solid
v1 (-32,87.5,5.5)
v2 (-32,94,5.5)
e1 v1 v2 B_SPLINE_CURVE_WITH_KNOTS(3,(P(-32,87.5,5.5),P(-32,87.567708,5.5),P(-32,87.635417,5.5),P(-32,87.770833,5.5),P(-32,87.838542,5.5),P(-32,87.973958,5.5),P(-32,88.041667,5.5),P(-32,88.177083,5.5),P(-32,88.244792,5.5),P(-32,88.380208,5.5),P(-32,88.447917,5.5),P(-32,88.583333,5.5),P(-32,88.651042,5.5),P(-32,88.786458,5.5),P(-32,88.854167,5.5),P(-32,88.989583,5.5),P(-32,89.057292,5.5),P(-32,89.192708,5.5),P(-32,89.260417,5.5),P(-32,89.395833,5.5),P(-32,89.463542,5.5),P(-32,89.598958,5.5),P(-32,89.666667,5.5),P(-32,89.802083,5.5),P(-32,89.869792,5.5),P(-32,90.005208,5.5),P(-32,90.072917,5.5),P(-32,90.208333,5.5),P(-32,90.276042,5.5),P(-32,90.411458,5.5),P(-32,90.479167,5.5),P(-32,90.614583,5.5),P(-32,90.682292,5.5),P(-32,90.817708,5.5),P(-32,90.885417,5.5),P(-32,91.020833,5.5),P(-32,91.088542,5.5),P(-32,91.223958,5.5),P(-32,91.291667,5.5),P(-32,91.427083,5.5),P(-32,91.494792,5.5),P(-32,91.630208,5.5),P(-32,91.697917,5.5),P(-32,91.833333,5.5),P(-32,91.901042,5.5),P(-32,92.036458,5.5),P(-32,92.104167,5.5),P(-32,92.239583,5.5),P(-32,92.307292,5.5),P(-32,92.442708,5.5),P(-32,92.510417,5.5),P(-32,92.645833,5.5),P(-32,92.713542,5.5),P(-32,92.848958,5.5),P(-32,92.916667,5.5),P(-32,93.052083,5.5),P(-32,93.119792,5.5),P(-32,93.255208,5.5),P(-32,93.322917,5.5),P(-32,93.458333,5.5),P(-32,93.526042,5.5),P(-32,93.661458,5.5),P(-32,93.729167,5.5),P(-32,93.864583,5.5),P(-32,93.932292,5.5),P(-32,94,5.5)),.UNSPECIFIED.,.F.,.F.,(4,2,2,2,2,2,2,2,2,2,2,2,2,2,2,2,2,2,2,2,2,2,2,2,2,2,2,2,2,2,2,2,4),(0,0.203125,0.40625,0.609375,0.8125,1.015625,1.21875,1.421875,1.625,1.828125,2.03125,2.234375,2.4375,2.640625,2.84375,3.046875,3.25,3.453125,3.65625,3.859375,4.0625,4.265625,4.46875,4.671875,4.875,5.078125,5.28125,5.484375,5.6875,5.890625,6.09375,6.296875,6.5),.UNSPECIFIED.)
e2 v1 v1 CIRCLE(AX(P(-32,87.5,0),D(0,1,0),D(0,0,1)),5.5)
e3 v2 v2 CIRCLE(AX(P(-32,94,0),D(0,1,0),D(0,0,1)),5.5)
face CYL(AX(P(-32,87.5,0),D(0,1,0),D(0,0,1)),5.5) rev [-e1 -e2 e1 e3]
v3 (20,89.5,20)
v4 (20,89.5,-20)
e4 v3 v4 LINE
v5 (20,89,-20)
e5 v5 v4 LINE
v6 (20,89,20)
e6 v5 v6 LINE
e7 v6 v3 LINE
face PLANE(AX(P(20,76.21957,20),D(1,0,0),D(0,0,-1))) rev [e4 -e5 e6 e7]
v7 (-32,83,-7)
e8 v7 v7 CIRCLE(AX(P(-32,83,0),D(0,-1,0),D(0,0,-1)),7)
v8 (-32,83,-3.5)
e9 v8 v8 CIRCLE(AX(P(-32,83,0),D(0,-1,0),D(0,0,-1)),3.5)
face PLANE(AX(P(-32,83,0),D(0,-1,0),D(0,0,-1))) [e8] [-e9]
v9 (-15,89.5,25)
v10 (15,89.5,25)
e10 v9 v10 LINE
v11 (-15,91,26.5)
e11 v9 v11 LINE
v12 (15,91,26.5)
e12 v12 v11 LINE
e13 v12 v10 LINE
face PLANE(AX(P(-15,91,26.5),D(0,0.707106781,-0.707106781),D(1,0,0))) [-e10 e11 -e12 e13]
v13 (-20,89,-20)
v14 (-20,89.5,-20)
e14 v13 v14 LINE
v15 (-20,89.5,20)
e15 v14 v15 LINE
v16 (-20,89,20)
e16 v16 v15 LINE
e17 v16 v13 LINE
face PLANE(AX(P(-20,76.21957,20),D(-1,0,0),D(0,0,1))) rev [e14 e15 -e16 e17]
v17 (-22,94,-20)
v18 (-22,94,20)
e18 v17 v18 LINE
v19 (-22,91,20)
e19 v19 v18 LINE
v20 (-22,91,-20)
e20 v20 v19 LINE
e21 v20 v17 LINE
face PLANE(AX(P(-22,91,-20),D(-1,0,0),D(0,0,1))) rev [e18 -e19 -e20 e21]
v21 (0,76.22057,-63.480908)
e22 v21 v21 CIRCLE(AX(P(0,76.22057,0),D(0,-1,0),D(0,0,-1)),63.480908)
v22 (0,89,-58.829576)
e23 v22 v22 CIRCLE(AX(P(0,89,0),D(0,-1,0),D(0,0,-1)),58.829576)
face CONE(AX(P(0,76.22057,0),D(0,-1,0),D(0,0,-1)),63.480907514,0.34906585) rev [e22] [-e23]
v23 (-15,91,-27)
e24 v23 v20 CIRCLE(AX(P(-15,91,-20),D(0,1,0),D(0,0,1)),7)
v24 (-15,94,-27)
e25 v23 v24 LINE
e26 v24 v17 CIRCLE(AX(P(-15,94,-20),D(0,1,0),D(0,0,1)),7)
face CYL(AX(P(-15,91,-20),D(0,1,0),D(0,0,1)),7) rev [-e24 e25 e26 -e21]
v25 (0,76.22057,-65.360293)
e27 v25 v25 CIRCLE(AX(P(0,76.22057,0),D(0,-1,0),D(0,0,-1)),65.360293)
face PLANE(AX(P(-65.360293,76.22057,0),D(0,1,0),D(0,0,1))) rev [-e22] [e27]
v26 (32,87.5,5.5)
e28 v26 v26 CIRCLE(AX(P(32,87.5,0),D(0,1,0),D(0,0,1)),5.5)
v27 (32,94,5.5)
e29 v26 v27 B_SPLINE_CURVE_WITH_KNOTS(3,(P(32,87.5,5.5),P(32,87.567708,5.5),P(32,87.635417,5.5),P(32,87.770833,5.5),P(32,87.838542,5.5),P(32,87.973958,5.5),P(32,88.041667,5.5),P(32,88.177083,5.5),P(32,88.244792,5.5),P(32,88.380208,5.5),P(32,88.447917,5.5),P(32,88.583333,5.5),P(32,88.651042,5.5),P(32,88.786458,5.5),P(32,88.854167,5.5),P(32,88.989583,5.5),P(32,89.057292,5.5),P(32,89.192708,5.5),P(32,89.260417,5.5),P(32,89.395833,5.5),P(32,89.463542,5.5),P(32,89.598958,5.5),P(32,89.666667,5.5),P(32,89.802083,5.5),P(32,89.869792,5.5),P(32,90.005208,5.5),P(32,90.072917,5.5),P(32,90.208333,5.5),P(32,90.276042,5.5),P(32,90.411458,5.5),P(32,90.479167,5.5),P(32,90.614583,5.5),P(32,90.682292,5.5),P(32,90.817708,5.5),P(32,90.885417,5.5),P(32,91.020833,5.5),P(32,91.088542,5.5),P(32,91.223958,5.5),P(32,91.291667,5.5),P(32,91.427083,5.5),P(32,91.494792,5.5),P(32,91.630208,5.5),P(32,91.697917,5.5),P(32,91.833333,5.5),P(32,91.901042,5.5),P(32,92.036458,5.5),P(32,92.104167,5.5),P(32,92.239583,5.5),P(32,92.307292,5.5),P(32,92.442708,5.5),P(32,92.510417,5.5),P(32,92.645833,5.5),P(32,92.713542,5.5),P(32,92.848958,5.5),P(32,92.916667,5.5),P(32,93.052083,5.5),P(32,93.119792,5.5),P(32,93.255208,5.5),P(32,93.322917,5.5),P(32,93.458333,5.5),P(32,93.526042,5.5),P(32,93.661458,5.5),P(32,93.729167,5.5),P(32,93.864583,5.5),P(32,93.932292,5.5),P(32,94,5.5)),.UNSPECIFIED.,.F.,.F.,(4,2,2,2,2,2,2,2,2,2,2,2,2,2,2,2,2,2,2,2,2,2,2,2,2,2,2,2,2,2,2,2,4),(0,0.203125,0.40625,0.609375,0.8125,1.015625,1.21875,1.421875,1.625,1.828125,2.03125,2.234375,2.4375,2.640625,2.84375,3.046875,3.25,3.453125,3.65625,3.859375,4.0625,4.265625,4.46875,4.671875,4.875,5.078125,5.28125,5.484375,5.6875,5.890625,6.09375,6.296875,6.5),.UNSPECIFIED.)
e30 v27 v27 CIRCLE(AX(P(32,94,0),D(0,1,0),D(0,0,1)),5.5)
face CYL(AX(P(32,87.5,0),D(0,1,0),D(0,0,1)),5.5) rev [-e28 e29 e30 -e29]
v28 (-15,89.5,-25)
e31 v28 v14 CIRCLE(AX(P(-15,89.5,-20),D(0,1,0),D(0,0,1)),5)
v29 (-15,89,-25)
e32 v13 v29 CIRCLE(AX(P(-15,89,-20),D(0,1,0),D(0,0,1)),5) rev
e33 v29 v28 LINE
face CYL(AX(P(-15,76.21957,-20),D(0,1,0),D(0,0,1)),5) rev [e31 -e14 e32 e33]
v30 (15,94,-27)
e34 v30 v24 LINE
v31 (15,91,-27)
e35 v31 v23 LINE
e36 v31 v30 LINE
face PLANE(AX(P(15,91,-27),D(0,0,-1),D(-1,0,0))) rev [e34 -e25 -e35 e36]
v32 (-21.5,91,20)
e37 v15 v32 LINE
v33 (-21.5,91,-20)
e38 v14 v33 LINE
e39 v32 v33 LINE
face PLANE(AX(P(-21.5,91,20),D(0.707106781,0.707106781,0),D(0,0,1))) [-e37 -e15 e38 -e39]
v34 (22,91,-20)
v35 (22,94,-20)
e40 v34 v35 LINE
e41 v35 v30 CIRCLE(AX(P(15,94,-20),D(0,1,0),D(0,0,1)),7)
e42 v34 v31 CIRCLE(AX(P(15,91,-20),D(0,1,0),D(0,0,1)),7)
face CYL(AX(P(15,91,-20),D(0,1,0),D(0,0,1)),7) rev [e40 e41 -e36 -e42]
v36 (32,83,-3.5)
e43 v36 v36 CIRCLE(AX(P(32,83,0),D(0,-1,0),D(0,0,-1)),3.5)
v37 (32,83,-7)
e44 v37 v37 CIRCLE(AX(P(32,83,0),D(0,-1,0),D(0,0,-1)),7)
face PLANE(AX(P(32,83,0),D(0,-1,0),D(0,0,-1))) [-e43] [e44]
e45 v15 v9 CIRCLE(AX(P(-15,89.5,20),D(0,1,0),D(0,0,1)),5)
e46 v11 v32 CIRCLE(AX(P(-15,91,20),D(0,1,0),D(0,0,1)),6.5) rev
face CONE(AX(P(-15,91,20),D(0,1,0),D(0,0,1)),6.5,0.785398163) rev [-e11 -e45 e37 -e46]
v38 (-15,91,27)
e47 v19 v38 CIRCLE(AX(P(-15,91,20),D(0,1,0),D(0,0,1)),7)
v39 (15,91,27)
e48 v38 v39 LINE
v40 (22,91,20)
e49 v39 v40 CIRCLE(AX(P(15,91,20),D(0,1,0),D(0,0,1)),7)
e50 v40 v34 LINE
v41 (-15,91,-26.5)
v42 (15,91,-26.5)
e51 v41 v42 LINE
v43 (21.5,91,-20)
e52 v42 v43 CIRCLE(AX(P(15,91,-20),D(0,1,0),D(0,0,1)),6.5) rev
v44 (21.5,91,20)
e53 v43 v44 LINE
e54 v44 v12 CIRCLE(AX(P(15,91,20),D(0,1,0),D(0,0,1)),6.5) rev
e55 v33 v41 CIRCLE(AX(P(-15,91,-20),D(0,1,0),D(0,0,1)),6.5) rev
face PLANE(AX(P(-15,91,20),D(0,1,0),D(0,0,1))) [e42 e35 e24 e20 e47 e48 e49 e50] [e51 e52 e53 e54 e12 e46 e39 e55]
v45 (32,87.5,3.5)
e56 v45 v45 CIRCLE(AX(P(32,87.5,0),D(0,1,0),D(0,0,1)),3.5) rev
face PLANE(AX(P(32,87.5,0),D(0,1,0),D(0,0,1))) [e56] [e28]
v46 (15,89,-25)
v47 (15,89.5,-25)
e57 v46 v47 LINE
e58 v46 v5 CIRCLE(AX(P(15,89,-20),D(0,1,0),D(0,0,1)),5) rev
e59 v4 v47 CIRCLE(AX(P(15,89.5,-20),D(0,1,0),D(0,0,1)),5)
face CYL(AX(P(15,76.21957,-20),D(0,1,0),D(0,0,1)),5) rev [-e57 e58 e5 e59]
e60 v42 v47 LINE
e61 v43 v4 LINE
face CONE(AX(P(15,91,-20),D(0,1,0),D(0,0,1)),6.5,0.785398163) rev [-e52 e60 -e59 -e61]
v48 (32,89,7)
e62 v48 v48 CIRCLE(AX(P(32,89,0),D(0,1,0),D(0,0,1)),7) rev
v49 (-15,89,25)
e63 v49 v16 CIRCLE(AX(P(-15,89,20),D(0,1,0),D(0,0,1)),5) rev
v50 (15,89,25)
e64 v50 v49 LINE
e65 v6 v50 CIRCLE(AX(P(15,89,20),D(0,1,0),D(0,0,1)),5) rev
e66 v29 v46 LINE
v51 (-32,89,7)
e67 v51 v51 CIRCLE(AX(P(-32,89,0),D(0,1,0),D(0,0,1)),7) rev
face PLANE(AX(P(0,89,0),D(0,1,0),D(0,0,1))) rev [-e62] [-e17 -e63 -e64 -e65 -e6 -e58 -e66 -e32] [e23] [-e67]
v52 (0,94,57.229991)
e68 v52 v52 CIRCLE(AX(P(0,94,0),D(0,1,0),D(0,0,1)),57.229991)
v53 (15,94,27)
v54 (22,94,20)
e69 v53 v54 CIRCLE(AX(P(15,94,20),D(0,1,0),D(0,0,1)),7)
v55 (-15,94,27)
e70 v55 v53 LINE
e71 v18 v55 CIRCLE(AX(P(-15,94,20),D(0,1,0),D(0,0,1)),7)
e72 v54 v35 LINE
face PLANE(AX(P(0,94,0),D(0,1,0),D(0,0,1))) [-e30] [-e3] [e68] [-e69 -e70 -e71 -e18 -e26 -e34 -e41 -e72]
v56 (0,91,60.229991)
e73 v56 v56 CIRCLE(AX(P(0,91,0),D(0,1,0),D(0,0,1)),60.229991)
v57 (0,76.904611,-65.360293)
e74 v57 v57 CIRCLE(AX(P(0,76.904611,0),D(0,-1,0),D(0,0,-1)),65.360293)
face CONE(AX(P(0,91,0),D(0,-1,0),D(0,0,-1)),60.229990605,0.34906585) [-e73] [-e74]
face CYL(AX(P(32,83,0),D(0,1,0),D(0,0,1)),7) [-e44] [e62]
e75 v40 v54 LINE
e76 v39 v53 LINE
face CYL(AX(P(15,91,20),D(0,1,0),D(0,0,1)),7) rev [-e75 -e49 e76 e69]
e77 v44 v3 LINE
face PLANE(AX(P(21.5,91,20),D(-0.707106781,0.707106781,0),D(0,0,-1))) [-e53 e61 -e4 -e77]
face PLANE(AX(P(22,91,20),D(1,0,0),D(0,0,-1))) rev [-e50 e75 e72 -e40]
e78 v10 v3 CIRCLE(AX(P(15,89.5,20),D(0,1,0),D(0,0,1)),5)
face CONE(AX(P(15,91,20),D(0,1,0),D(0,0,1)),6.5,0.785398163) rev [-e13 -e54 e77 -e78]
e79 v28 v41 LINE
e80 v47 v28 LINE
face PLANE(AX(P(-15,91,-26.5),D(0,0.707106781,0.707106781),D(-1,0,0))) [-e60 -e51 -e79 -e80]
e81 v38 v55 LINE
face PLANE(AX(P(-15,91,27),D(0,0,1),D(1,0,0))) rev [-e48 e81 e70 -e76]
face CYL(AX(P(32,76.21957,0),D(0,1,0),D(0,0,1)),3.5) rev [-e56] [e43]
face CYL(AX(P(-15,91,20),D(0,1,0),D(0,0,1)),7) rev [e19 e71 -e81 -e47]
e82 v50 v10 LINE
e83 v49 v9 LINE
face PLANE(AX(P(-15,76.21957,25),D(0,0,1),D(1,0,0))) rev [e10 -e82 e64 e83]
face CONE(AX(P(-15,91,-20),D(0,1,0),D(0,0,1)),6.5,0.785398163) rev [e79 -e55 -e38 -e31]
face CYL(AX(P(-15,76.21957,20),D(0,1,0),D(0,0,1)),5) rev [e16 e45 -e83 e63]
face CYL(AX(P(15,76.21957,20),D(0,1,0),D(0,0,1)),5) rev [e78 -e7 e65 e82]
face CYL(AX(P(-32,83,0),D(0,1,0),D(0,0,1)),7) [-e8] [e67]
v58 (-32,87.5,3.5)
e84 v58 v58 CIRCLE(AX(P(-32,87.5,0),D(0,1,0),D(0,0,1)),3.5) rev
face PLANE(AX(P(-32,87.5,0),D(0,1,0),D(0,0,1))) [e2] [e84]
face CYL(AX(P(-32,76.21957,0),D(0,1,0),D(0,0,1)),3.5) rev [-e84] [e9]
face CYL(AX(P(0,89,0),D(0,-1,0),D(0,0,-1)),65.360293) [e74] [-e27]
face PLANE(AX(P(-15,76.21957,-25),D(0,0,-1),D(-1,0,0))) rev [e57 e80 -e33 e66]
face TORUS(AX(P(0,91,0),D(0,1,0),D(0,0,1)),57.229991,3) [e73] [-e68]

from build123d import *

# Parameters (mm, degrees)
CORTAR_EXTRUIR1_REACH   = 95.608
CROQUIS2_R              = 3.5
CROQUIS3_R              = 7
CROQUIS3_R_2            = 3.5
SALIENTE_EXTRUIR1_DEPTH = 6
SALIENTE_EXTRUIR2_START = 3
CROQUIS4_R              = 60.229990605
CROQUIS4_R_2            = 3.5
SALIENTE_EXTRUIR2_DEPTH = 3
CROQUIS5_R              = 5.5
CORTAR_EXTRUIR2_DEPTH   = 6.5
CORTAR_EXTRUIR3_REACH   = 96.128
CORTAR_EXTRUIR4_DEPTH   = 3
CHAFL_N1_SIZE           = 1.5
REDONDEO1_R             = 3


with BuildPart() as part:
    # Croquis1 → Revolución1 (revolve)
    with BuildSketch(Plane.XY, mode=Mode.PRIVATE) as revoluci_n1_sk:
        Polygon((-65.360292755, 76.904610688), (-65.360292755, 76.220570402), (-63.480907514, 76.220570402), (-58.829575529, 89), (0, 89), (0, 91), (-60.229990605, 91), align=None)
    revolve(revoluci_n1_sk.sketch.rotate(Axis((0, 89, 0), (0, 1, 0)), 270), axis=Axis((0, 89, 0), (0, 1, 0)))

    # Croquis2 → Cortar-Extruir1 (cut, up to next)
    with BuildSketch(Plane(origin=(0, 91, 0), x_dir=(1, 0, 0), z_dir=(0, 1, 0)), mode=Mode.PRIVATE) as cortar_extruir1_sk1:
        with Locations(Location((32, 0, 0), (0, 0, 270))):
            Circle(CROQUIS2_R)
    cortar_extruir1_tool1 = extrude(cortar_extruir1_sk1.sketch, amount=-CORTAR_EXTRUIR1_REACH, mode=Mode.PRIVATE) & part.part
    # Croquis2 → Cortar-Extruir1 (cut, up to next)
    with BuildSketch(Plane(origin=(0, 91, 0), x_dir=(1, 0, 0), z_dir=(0, 1, 0)), mode=Mode.PRIVATE) as cortar_extruir1_sk2:
        with Locations(Location((-32, 0, 0), (0, 0, 270))):
            Circle(CROQUIS2_R)
    cortar_extruir1_tool2 = extrude(cortar_extruir1_sk2.sketch, amount=-CORTAR_EXTRUIR1_REACH, mode=Mode.PRIVATE) & part.part
    add(cortar_extruir1_tool1.solids().sort_by_distance((32, 91, 0))[0], mode=Mode.SUBTRACT)
    add(cortar_extruir1_tool2.solids().sort_by_distance((-32, 91, 0))[0], mode=Mode.SUBTRACT)

    # Croquis3 → Saliente-Extruir1 (add)
    # profile 1 of 2: a face of its own
    with BuildSketch(Plane.XZ.offset(-89)):
        with Locations(Location((-32, 0, 0), (0, 0, 90))):
            Circle(CROQUIS3_R)
        with Locations(Location((-32, 0, 0), (0, 0, 90))):
            Circle(CROQUIS3_R_2, mode=Mode.SUBTRACT)
    # profile 2 of 2: a face of its own
    with BuildSketch(Plane.XZ.offset(-89)):
        with Locations(Location((32, 0, 0), (0, 0, 90))):
            Circle(CROQUIS3_R)
        with Locations(Location((32, 0, 0), (0, 0, 90))):
            Circle(CROQUIS3_R_2, mode=Mode.SUBTRACT)
    extrude(amount=SALIENTE_EXTRUIR1_DEPTH)

    # Croquis4 → Saliente-Extruir2 (add)
    with BuildSketch(Plane(origin=(0, 91, 0), x_dir=(1, 0, 0), z_dir=(0, 1, 0)).offset(SALIENTE_EXTRUIR2_START)):
        with Locations(Location((0, 0, 0), (0, 0, 270))):
            Circle(CROQUIS4_R)
        with Locations(Location((32, 0, 0), (0, 0, 270))):
            Circle(CROQUIS4_R_2, mode=Mode.SUBTRACT)
        with Locations(Location((-32, 0, 0), (0, 0, 270))):
            Circle(CROQUIS4_R_2, mode=Mode.SUBTRACT)
    extrude(amount=-SALIENTE_EXTRUIR2_DEPTH)

    # Croquis5 → Cortar-Extruir2 (cut)
    with BuildSketch(Plane(origin=(0, 94, 0), x_dir=(1, 0, 0), z_dir=(0, 1, 0))):
        with Locations(Location((-32, 0, 0), (0, 0, 270))):
            Circle(CROQUIS5_R)
        with Locations(Location((32, 0, 0), (0, 0, 270))):
            Circle(CROQUIS5_R)
    extrude(amount=-CORTAR_EXTRUIR2_DEPTH, mode=Mode.SUBTRACT)

    # Croquis6 → Cortar-Extruir3 (cut, up to next)
    with BuildSketch(Plane(origin=(0, 94, 0), x_dir=(1, 0, 0), z_dir=(0, 1, 0)), mode=Mode.PRIVATE) as cortar_extruir3_sk1:
        with BuildLine():
            Line((-15, -25), (15, -25))
            ThreePointArc((15, -25), (18.535533906, -23.535533906), (20, -20))
            Line((20, -20), (20, 20))
            ThreePointArc((20, 20), (18.535533906, 23.535533906), (15, 25))
            Line((15, 25), (-15, 25))
            ThreePointArc((-15, 25), (-18.535533906, 23.535533906), (-20, 20))
            Line((-20, 20), (-20, -20))
            ThreePointArc((-20, -20), (-18.535533906, -23.535533906), (-15, -25))
        make_face()
    cortar_extruir3_tool1 = extrude(cortar_extruir3_sk1.sketch, amount=-CORTAR_EXTRUIR3_REACH, mode=Mode.PRIVATE) & part.part
    add(cortar_extruir3_tool1.solids().sort_by_distance((0, 94, 0))[0], mode=Mode.SUBTRACT)

    # Croquis7 → Cortar-Extruir4 (cut)
    with BuildSketch(Plane(origin=(0, 94, 0), x_dir=(1, 0, 0), z_dir=(0, 1, 0))):
        with BuildLine():
            Line((-15, -27), (15, -27))
            ThreePointArc((15, -27), (19.949747468, -24.949747468), (22, -20))
            Line((22, -20), (22, 20))
            ThreePointArc((22, 20), (19.949747468, 24.949747468), (15, 27))
            Line((15, 27), (-15, 27))
            ThreePointArc((-15, 27), (-19.949747468, 24.949747468), (-22, 20))
            Line((-22, 20), (-22, -20))
            ThreePointArc((-22, -20), (-19.949747468, -24.949747468), (-15, -27))
        make_face()
    extrude(amount=-CORTAR_EXTRUIR4_DEPTH, mode=Mode.SUBTRACT)

    # Chaflán1
    chafl_n1_edges = [part.edges().sort_by_distance(p)[0] for p in [
        (0, 91, 25),
        (-18.535533906, 91, 23.535533906),
        (-20, 91, 0),
        (-18.535533906, 91, -23.535533906),
        (0, 91, -25),
        (18.535533906, 91, -23.535533906),
        (20, 91, 0),
        (18.535533906, 91, 23.535533906),
    ]]
    chamfer(chafl_n1_edges, length=CHAFL_N1_SIZE)

    # Redondeo1
    redondeo1_edges = [part.edges().sort_by_distance(p)[0] for p in [
        (0, 94, -60.229990605),
    ]]
    fillet(redondeo1_edges, radius=REDONDEO1_R - 0.0001)  # a hair under: the kernel refuses the full size


solid = part.part
